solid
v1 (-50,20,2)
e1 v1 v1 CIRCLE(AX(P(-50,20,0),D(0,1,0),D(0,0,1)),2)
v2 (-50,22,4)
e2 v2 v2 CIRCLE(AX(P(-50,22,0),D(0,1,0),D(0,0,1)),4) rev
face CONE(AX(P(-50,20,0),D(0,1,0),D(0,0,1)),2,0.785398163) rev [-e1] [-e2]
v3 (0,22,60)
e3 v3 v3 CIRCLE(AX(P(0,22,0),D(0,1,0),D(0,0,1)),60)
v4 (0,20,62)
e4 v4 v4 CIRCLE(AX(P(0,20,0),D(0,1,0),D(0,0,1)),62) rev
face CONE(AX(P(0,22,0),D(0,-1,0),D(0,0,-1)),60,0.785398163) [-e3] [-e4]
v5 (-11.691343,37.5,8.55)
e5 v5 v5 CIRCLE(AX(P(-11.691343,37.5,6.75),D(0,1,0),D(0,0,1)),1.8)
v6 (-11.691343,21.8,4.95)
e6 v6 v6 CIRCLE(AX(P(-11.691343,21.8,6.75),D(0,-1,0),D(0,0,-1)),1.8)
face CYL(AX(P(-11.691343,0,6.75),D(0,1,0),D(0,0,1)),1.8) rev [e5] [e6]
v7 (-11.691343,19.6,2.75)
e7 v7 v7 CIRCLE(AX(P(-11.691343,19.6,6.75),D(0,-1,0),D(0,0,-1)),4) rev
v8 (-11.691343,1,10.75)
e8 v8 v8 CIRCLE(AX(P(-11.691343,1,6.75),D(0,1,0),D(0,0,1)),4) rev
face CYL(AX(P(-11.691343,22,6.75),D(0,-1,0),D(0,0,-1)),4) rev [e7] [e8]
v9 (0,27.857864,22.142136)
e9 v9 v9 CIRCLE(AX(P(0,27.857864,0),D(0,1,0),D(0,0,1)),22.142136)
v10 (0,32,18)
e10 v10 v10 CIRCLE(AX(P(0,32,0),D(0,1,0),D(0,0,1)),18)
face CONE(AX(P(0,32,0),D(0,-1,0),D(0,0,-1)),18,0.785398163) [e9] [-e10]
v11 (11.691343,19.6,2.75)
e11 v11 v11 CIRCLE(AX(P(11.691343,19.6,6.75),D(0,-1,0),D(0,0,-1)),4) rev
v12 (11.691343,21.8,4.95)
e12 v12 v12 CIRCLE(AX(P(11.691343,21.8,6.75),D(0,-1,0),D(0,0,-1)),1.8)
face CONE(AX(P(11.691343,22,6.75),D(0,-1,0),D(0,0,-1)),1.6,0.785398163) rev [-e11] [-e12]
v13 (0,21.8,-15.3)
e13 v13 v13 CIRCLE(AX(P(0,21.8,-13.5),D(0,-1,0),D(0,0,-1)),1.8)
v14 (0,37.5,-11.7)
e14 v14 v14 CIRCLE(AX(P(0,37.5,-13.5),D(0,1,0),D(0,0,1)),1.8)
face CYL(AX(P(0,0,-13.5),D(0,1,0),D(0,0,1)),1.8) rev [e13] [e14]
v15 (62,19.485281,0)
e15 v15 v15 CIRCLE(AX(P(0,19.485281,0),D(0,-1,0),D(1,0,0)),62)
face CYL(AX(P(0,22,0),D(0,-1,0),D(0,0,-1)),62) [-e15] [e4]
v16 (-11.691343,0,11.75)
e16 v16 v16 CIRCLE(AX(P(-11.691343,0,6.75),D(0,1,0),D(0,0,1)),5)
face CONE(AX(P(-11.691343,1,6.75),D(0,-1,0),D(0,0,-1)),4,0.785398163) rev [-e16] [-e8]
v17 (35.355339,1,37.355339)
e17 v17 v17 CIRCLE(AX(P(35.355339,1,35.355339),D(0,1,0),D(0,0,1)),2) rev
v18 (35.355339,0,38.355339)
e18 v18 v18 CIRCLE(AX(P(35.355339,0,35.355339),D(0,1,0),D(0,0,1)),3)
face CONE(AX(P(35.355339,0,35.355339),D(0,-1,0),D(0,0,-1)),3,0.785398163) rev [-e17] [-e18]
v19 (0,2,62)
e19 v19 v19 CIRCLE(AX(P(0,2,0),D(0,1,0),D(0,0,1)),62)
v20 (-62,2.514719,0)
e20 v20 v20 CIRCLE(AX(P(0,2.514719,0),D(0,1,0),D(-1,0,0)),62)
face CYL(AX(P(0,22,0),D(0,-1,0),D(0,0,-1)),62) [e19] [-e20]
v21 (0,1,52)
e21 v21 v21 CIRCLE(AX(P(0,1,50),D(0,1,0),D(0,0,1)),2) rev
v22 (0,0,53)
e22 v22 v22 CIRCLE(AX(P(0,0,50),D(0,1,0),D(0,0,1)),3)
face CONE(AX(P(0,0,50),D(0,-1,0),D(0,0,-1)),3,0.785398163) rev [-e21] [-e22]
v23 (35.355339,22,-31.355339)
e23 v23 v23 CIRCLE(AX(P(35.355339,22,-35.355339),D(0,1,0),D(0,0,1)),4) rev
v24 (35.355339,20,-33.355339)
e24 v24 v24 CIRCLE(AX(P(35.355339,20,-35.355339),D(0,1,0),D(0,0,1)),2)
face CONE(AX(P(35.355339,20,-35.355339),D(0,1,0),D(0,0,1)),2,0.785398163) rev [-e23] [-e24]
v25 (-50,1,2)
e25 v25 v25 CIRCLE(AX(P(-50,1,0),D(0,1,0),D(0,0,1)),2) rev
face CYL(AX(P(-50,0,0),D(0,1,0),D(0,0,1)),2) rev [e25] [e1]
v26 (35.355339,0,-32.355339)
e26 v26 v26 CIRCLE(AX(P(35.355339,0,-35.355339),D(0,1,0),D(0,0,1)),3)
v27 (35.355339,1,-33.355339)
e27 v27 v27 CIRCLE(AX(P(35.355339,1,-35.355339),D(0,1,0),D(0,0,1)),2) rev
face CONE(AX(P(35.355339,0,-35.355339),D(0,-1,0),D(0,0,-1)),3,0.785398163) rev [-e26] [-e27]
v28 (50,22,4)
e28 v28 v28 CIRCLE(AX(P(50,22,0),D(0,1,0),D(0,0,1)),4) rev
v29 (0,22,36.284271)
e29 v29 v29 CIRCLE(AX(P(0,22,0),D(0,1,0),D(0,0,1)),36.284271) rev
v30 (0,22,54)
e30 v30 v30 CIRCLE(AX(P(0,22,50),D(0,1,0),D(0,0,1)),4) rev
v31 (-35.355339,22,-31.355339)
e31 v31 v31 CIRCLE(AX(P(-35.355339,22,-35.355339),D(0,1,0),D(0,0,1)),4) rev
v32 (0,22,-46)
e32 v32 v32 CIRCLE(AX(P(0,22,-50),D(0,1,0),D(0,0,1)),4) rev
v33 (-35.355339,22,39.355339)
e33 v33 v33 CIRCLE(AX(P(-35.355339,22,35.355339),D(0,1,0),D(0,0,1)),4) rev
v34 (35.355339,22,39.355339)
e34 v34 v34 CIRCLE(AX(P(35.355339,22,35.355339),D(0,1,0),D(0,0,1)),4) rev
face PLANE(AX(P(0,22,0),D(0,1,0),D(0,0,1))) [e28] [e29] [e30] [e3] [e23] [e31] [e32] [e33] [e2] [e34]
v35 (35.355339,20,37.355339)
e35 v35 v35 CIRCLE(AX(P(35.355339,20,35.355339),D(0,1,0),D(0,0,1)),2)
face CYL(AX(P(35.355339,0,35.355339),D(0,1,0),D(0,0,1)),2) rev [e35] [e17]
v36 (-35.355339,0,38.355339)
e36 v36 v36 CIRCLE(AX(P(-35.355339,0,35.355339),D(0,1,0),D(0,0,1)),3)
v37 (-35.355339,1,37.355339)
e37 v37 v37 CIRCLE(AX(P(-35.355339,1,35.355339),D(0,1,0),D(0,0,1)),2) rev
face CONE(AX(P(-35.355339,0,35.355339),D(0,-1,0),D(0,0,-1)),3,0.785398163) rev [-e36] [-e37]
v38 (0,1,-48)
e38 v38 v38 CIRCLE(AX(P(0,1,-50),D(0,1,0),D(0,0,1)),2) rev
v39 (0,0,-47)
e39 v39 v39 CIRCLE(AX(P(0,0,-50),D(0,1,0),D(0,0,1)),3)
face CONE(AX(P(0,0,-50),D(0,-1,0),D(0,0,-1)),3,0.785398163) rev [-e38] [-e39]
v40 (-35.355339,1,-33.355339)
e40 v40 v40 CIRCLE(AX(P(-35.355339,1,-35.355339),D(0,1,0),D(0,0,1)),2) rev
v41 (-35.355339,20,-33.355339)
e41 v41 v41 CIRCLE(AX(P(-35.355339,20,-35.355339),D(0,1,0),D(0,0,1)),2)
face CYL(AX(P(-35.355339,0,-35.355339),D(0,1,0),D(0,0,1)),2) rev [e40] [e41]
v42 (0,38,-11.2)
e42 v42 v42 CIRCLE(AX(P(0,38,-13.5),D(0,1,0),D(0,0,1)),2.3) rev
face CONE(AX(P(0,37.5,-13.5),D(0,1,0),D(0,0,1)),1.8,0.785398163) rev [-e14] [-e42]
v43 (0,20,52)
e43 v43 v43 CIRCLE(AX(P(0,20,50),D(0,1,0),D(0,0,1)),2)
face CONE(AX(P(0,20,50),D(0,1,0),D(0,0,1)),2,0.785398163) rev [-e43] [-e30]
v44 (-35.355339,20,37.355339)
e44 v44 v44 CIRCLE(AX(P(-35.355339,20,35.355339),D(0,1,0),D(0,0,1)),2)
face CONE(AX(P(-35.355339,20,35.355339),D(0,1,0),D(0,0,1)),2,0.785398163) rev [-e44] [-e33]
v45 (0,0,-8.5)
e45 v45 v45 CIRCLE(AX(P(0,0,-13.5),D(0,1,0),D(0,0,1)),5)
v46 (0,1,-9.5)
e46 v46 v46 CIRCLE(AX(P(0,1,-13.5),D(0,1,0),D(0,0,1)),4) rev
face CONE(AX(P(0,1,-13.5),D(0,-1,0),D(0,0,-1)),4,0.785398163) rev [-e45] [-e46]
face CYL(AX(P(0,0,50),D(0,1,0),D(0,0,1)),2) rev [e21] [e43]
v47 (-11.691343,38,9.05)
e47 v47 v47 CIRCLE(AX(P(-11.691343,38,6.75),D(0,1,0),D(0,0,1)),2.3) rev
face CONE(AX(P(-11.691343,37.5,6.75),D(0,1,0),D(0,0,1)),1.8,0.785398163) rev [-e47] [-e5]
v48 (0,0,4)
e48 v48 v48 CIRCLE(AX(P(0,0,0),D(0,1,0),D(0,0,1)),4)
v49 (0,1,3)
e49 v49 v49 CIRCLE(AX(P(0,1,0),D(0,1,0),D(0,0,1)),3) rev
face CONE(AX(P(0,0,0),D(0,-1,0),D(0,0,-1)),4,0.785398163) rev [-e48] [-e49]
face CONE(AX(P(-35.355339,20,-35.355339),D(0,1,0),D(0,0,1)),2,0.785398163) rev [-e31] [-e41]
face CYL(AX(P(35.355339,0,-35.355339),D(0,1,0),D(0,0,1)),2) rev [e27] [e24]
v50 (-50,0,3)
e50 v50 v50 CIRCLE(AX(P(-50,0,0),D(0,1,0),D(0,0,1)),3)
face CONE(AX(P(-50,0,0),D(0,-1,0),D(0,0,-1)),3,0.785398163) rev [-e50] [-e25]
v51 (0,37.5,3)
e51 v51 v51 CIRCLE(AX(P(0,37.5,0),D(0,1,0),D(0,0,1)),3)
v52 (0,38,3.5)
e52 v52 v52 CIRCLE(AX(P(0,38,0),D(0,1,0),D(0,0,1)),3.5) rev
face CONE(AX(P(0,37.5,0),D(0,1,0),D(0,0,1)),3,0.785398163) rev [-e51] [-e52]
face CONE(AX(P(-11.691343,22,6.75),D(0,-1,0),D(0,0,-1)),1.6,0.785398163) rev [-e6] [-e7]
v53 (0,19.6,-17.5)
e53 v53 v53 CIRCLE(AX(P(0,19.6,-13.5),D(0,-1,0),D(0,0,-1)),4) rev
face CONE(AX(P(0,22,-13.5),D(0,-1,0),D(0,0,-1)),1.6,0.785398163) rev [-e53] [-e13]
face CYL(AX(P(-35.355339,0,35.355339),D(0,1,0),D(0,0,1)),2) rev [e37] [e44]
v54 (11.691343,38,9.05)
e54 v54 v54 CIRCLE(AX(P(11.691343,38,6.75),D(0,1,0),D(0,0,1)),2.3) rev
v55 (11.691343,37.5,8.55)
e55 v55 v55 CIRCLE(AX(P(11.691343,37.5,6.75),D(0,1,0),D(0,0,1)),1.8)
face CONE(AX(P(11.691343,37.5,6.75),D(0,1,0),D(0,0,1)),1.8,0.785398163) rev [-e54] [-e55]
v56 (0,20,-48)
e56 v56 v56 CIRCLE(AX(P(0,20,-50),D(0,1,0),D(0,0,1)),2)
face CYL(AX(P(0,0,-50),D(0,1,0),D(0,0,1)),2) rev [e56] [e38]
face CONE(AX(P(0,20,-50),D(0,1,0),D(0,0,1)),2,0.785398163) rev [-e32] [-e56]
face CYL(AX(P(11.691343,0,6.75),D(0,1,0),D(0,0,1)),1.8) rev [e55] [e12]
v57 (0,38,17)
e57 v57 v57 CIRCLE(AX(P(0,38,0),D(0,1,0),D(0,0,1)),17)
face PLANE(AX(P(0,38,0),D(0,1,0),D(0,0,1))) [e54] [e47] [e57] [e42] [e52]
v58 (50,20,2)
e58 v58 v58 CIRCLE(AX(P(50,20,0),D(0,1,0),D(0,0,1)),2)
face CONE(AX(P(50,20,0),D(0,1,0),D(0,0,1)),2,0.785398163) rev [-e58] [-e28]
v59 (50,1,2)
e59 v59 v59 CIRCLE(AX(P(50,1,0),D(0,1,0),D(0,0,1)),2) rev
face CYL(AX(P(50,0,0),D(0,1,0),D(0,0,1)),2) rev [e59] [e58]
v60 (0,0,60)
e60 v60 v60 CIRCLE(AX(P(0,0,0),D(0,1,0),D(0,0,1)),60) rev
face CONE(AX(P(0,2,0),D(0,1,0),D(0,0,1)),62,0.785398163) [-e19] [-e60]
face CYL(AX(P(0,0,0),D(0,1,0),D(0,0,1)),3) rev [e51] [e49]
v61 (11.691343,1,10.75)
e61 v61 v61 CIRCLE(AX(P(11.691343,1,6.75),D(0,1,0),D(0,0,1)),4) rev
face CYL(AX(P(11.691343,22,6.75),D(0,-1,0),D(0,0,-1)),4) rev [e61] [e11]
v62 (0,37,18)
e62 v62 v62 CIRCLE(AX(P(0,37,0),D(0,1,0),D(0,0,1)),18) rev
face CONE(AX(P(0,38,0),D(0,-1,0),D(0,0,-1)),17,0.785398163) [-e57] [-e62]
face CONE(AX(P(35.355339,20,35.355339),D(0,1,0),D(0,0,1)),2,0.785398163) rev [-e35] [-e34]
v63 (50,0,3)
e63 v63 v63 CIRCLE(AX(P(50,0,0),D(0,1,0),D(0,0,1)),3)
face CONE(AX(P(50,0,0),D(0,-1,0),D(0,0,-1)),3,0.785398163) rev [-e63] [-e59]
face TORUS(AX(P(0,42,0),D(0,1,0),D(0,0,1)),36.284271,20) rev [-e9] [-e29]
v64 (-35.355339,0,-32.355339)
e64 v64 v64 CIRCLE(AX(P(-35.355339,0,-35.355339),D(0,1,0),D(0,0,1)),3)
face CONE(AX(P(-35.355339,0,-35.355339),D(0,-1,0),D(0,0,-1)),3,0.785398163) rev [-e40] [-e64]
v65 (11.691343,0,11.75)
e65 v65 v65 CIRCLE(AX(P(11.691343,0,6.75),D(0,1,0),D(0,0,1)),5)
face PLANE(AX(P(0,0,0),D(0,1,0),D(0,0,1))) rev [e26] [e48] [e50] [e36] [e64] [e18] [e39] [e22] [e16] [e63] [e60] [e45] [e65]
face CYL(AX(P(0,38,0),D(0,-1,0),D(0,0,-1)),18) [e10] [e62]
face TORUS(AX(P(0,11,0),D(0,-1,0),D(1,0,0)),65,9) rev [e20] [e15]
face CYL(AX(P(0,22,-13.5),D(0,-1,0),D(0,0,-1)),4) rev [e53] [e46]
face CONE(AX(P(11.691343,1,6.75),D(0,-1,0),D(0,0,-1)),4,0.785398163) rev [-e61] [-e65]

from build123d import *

# Parameters (mm, degrees)
SKETCH_1_R               = 62
EXTRUDE_1_DEPTH          = 22
SKETCH_3_R               = 9
CHAMFER_3_SIZE           = 2
CHAMFER_2_SIZE           = 2
SKETCH_4_R               = 18
EXTRUDE_2_DEPTH          = 16
CHAMFER_4_SIZE           = 10
FILLET_1_R               = 20
SKETCH_5_R               = 1.8
CUT_EXTRUDE_1_DEPTH      = 96.561498523
SKETCH_6_R               = 4
CUT_EXTRUDE_2_DEPTH      = 22
CHAMFER_5_SIZE           = 2.4
CHAMFER_6_SIZE           = 1
CHAMFER_7_SIZE           = 1
CUT_EXTRUDE_3_DEPTH      = 96.561498523
CUT_EXTRUDE_3_DEPTH_BACK = 96.561498523
SKETCH_7_R               = 2
SKETCH_7_R_2             = 3
CHAMFER_8_SIZE           = 2
CHAMFER_9_SIZE           = 0.5
CHAMFER_10_SIZE          = 1


with BuildPart() as part:
    # Эскиз1 → Бобышка-Вытянуть1 (new body)
    with BuildSketch(Plane(origin=(0, 0, 0), x_dir=(1, 0, 0), z_dir=(0, 1, 0))):
        with Locations(Location((0, 0, 0), (0, 0, 270))):
            Circle(SKETCH_1_R)
    extrude(amount=EXTRUDE_1_DEPTH)

    # Эскиз3 → Вырез-Повернуть2 (revolve, cut)
    with BuildSketch(Plane.XY, mode=Mode.PRIVATE) as cut_revolve_2_sk:
        with Locations((-65, 11)):
            Circle(SKETCH_3_R)
    revolve(cut_revolve_2_sk.sketch.rotate(Axis((0, 0, 0), (0, 1, 0)), 180), axis=Axis((0, 0, 0), (0, 1, 0)), mode=Mode.SUBTRACT)

    # Фаска3
    chamfer_3_edges = [part.edges().sort_by_distance(p)[0] for p in [
        (0, 0, -62),
    ]]
    chamfer(chamfer_3_edges, length=CHAMFER_3_SIZE)

    # Фаска2
    chamfer_2_edges = [part.edges().sort_by_distance(p)[0] for p in [
        (0, 22, -62),
    ]]
    chamfer(chamfer_2_edges, length=CHAMFER_2_SIZE)

    # Эскиз4 → Бобышка-Вытянуть2 (add)
    with BuildSketch(Plane(origin=(0, 22, 0), x_dir=(1, 0, 0), z_dir=(0, 1, 0))):
        with Locations(Location((0, 0, 0), (0, 0, 270))):
            Circle(SKETCH_4_R)
    extrude(amount=EXTRUDE_2_DEPTH)

    # Фаска4
    chamfer_4_edges = [part.edges().sort_by_distance(p)[0] for p in [
        (0, 22, -18),
    ]]
    chamfer(chamfer_4_edges, length=CHAMFER_4_SIZE)

    # Скругление1
    fillet_1_edges = [part.edges().sort_by_distance(p)[0] for p in [
        (0, 22, -28),
    ]]
    fillet(fillet_1_edges, radius=FILLET_1_R)

    # Эскиз5 → Вырез-Вытянуть1 (cut, through all)
    with BuildSketch(Plane(origin=(0, 38, 0), x_dir=(1, 0, 0), z_dir=(0, 1, 0))):
        with Locations(Location((0, 13.5, 0), (0, 0, 270))):
            Circle(SKETCH_5_R)
        with Locations(Location((11.691342951, -6.75, 0), (0, 0, 270))):
            Circle(SKETCH_5_R)
        with Locations(Location((-11.691342951, -6.75, 0), (0, 0, 270))):
            Circle(SKETCH_5_R)
    extrude(amount=-CUT_EXTRUDE_1_DEPTH, mode=Mode.SUBTRACT)

    # Эскиз6 → Вырез-Вытянуть2 (cut)
    with BuildSketch(Plane.XZ):
        with Locations(Location((0, -13.5, 0), (0, 0, 270))):
            Circle(SKETCH_6_R)
        with Locations(Location((11.691342951, 6.75, 0), (0, 0, 270))):
            Circle(SKETCH_6_R)
        with Locations(Location((-11.691342951, 6.75, 0), (0, 0, 270))):
            Circle(SKETCH_6_R)
    extrude(amount=-CUT_EXTRUDE_2_DEPTH, mode=Mode.SUBTRACT)

    # Фаска5
    # the kernel refuses this chamfer: 2.4 mm, written as the material it adds along each edge
    with BuildSketch(Plane(origin=(0, 22, -13.5), x_dir=(0, 0, -1), z_dir=(-1, 0, 0))) as chamfer_5_piece_1_section:
        Polygon((4 - CHAMFER_5_SIZE, 0), (4, CHAMFER_5_SIZE), (4, 0), align=None)
    chamfer_5_piece_1 = revolve(axis=Axis((0, 22, -13.5), (0, -1, 0)), mode=Mode.PRIVATE)
    chamfer_5_piece_1 = chamfer_5_piece_1 - Plane(origin=(0, 20.694254698, -13.5), x_dir=(0, 0, 1), z_dir=(0, 1, 0)) * Cylinder(1.8, 16, mode=Mode.PRIVATE)
    add(chamfer_5_piece_1)
    with BuildSketch(Plane(origin=(-11.691342951, 22, 6.75), x_dir=(0, 0, -1), z_dir=(-1, 0, 0))) as chamfer_5_piece_2_section:
        Polygon((4 - CHAMFER_5_SIZE, 0), (4, CHAMFER_5_SIZE), (4, 0), align=None)
    chamfer_5_piece_2 = revolve(axis=Axis((-11.691342951, 22, 6.75), (0, -1, 0)), mode=Mode.PRIVATE)
    chamfer_5_piece_2 = chamfer_5_piece_2 - Plane(origin=(-11.691342951, 20.694254698, 6.75), x_dir=(0, 0, 1), z_dir=(0, 1, 0)) * Cylinder(1.8, 17, mode=Mode.PRIVATE)
    add(chamfer_5_piece_2)
    with BuildSketch(Plane(origin=(11.691342951, 22, 6.75), x_dir=(0, 0, -1), z_dir=(-1, 0, 0))) as chamfer_5_piece_3_section:
        Polygon((4 - CHAMFER_5_SIZE, 0), (4, CHAMFER_5_SIZE), (4, 0), align=None)
    chamfer_5_piece_3 = revolve(axis=Axis((11.691342951, 22, 6.75), (0, -1, 0)), mode=Mode.PRIVATE)
    chamfer_5_piece_3 = chamfer_5_piece_3 - Plane(origin=(11.691342951, 20.694254698, 6.75), x_dir=(0, 0, 1), z_dir=(0, 1, 0)) * Cylinder(1.8, 17, mode=Mode.PRIVATE)
    add(chamfer_5_piece_3)

    # Фаска6
    chamfer_6_edges = [part.edges().sort_by_distance(p)[0] for p in [
        (0, 0, -9.5),
        (11.691342951, 0, 10.75),
        (-11.691342951, 0, 10.75),
    ]]
    chamfer(chamfer_6_edges, length=CHAMFER_6_SIZE)

    # Фаска7
    chamfer_7_edges = [part.edges().sort_by_distance(p)[0] for p in [
        (0, 38, -18),
    ]]
    chamfer(chamfer_7_edges, length=CHAMFER_7_SIZE)

    # Эскиз7 → Вырез-Вытянуть3 (cut, two sides: drawn at the far end of the back side and taken through both)
    with BuildSketch(Plane(origin=(0, 38, 0), x_dir=(1, 0, 0), z_dir=(0, 1, 0)).offset(-CUT_EXTRUDE_3_DEPTH_BACK)):
        with Locations(Location((0, 50, 0), (0, 0, 270))):
            Circle(SKETCH_7_R)
        with Locations(Location((35.355339059, 35.355339059, 0), (0, 0, 270))):
            Circle(SKETCH_7_R)
        with Locations(Location((50, 0, 0), (0, 0, 270))):
            Circle(SKETCH_7_R)
        with Locations(Location((35.355339059, -35.355339059, 0), (0, 0, 270))):
            Circle(SKETCH_7_R)
        with Locations(Location((0, -50, 0), (0, 0, 270))):
            Circle(SKETCH_7_R)
        with Locations(Location((-35.355339059, -35.355339059, 0), (0, 0, 270))):
            Circle(SKETCH_7_R)
        with Locations(Location((-50, 0, 0), (0, 0, 270))):
            Circle(SKETCH_7_R)
        with Locations(Location((-35.355339059, 35.355339059, 0), (0, 0, 270))):
            Circle(SKETCH_7_R)
        with Locations(Location((0, 0, 0), (0, 0, 270))):
            Circle(SKETCH_7_R_2)
    extrude(amount=CUT_EXTRUDE_3_DEPTH + CUT_EXTRUDE_3_DEPTH_BACK, mode=Mode.SUBTRACT)

    # Фаска8
    chamfer_8_edges = [part.edges().sort_by_distance(p)[0] for p in [
        (-35.355339059, 22, 33.355339059),
        (0, 22, 48),
        (35.355339059, 22, -37.355339059),
        (50, 22, -2),
        (35.355339059, 22, 33.355339059),
        (0, 22, -52),
        (-35.355339059, 22, -37.355339059),
        (-50, 22, -2),
    ]]
    chamfer(chamfer_8_edges, length=CHAMFER_8_SIZE)

    # Фаска9
    chamfer_9_edges = [part.edges().sort_by_distance(p)[0] for p in [
        (0, 38, -3),
        (0, 38, -15.3),
        (11.691342951, 38, 4.95),
        (-11.691342951, 38, 4.95),
    ]]
    chamfer(chamfer_9_edges, length=CHAMFER_9_SIZE)

    # Фаска10
    chamfer_10_edges = [part.edges().sort_by_distance(p)[0] for p in [
        (-35.355339059, 0, 33.355339059),
        (0, 0, 48),
        (0, 0, -3),
        (35.355339059, 0, -37.355339059),
        (50, 0, -2),
        (35.355339059, 0, 33.355339059),
        (0, 0, -52),
        (-35.355339059, 0, -37.355339059),
        (-50, 0, -2),
    ]]
    chamfer(chamfer_10_edges, length=CHAMFER_10_SIZE)


solid = part.part
